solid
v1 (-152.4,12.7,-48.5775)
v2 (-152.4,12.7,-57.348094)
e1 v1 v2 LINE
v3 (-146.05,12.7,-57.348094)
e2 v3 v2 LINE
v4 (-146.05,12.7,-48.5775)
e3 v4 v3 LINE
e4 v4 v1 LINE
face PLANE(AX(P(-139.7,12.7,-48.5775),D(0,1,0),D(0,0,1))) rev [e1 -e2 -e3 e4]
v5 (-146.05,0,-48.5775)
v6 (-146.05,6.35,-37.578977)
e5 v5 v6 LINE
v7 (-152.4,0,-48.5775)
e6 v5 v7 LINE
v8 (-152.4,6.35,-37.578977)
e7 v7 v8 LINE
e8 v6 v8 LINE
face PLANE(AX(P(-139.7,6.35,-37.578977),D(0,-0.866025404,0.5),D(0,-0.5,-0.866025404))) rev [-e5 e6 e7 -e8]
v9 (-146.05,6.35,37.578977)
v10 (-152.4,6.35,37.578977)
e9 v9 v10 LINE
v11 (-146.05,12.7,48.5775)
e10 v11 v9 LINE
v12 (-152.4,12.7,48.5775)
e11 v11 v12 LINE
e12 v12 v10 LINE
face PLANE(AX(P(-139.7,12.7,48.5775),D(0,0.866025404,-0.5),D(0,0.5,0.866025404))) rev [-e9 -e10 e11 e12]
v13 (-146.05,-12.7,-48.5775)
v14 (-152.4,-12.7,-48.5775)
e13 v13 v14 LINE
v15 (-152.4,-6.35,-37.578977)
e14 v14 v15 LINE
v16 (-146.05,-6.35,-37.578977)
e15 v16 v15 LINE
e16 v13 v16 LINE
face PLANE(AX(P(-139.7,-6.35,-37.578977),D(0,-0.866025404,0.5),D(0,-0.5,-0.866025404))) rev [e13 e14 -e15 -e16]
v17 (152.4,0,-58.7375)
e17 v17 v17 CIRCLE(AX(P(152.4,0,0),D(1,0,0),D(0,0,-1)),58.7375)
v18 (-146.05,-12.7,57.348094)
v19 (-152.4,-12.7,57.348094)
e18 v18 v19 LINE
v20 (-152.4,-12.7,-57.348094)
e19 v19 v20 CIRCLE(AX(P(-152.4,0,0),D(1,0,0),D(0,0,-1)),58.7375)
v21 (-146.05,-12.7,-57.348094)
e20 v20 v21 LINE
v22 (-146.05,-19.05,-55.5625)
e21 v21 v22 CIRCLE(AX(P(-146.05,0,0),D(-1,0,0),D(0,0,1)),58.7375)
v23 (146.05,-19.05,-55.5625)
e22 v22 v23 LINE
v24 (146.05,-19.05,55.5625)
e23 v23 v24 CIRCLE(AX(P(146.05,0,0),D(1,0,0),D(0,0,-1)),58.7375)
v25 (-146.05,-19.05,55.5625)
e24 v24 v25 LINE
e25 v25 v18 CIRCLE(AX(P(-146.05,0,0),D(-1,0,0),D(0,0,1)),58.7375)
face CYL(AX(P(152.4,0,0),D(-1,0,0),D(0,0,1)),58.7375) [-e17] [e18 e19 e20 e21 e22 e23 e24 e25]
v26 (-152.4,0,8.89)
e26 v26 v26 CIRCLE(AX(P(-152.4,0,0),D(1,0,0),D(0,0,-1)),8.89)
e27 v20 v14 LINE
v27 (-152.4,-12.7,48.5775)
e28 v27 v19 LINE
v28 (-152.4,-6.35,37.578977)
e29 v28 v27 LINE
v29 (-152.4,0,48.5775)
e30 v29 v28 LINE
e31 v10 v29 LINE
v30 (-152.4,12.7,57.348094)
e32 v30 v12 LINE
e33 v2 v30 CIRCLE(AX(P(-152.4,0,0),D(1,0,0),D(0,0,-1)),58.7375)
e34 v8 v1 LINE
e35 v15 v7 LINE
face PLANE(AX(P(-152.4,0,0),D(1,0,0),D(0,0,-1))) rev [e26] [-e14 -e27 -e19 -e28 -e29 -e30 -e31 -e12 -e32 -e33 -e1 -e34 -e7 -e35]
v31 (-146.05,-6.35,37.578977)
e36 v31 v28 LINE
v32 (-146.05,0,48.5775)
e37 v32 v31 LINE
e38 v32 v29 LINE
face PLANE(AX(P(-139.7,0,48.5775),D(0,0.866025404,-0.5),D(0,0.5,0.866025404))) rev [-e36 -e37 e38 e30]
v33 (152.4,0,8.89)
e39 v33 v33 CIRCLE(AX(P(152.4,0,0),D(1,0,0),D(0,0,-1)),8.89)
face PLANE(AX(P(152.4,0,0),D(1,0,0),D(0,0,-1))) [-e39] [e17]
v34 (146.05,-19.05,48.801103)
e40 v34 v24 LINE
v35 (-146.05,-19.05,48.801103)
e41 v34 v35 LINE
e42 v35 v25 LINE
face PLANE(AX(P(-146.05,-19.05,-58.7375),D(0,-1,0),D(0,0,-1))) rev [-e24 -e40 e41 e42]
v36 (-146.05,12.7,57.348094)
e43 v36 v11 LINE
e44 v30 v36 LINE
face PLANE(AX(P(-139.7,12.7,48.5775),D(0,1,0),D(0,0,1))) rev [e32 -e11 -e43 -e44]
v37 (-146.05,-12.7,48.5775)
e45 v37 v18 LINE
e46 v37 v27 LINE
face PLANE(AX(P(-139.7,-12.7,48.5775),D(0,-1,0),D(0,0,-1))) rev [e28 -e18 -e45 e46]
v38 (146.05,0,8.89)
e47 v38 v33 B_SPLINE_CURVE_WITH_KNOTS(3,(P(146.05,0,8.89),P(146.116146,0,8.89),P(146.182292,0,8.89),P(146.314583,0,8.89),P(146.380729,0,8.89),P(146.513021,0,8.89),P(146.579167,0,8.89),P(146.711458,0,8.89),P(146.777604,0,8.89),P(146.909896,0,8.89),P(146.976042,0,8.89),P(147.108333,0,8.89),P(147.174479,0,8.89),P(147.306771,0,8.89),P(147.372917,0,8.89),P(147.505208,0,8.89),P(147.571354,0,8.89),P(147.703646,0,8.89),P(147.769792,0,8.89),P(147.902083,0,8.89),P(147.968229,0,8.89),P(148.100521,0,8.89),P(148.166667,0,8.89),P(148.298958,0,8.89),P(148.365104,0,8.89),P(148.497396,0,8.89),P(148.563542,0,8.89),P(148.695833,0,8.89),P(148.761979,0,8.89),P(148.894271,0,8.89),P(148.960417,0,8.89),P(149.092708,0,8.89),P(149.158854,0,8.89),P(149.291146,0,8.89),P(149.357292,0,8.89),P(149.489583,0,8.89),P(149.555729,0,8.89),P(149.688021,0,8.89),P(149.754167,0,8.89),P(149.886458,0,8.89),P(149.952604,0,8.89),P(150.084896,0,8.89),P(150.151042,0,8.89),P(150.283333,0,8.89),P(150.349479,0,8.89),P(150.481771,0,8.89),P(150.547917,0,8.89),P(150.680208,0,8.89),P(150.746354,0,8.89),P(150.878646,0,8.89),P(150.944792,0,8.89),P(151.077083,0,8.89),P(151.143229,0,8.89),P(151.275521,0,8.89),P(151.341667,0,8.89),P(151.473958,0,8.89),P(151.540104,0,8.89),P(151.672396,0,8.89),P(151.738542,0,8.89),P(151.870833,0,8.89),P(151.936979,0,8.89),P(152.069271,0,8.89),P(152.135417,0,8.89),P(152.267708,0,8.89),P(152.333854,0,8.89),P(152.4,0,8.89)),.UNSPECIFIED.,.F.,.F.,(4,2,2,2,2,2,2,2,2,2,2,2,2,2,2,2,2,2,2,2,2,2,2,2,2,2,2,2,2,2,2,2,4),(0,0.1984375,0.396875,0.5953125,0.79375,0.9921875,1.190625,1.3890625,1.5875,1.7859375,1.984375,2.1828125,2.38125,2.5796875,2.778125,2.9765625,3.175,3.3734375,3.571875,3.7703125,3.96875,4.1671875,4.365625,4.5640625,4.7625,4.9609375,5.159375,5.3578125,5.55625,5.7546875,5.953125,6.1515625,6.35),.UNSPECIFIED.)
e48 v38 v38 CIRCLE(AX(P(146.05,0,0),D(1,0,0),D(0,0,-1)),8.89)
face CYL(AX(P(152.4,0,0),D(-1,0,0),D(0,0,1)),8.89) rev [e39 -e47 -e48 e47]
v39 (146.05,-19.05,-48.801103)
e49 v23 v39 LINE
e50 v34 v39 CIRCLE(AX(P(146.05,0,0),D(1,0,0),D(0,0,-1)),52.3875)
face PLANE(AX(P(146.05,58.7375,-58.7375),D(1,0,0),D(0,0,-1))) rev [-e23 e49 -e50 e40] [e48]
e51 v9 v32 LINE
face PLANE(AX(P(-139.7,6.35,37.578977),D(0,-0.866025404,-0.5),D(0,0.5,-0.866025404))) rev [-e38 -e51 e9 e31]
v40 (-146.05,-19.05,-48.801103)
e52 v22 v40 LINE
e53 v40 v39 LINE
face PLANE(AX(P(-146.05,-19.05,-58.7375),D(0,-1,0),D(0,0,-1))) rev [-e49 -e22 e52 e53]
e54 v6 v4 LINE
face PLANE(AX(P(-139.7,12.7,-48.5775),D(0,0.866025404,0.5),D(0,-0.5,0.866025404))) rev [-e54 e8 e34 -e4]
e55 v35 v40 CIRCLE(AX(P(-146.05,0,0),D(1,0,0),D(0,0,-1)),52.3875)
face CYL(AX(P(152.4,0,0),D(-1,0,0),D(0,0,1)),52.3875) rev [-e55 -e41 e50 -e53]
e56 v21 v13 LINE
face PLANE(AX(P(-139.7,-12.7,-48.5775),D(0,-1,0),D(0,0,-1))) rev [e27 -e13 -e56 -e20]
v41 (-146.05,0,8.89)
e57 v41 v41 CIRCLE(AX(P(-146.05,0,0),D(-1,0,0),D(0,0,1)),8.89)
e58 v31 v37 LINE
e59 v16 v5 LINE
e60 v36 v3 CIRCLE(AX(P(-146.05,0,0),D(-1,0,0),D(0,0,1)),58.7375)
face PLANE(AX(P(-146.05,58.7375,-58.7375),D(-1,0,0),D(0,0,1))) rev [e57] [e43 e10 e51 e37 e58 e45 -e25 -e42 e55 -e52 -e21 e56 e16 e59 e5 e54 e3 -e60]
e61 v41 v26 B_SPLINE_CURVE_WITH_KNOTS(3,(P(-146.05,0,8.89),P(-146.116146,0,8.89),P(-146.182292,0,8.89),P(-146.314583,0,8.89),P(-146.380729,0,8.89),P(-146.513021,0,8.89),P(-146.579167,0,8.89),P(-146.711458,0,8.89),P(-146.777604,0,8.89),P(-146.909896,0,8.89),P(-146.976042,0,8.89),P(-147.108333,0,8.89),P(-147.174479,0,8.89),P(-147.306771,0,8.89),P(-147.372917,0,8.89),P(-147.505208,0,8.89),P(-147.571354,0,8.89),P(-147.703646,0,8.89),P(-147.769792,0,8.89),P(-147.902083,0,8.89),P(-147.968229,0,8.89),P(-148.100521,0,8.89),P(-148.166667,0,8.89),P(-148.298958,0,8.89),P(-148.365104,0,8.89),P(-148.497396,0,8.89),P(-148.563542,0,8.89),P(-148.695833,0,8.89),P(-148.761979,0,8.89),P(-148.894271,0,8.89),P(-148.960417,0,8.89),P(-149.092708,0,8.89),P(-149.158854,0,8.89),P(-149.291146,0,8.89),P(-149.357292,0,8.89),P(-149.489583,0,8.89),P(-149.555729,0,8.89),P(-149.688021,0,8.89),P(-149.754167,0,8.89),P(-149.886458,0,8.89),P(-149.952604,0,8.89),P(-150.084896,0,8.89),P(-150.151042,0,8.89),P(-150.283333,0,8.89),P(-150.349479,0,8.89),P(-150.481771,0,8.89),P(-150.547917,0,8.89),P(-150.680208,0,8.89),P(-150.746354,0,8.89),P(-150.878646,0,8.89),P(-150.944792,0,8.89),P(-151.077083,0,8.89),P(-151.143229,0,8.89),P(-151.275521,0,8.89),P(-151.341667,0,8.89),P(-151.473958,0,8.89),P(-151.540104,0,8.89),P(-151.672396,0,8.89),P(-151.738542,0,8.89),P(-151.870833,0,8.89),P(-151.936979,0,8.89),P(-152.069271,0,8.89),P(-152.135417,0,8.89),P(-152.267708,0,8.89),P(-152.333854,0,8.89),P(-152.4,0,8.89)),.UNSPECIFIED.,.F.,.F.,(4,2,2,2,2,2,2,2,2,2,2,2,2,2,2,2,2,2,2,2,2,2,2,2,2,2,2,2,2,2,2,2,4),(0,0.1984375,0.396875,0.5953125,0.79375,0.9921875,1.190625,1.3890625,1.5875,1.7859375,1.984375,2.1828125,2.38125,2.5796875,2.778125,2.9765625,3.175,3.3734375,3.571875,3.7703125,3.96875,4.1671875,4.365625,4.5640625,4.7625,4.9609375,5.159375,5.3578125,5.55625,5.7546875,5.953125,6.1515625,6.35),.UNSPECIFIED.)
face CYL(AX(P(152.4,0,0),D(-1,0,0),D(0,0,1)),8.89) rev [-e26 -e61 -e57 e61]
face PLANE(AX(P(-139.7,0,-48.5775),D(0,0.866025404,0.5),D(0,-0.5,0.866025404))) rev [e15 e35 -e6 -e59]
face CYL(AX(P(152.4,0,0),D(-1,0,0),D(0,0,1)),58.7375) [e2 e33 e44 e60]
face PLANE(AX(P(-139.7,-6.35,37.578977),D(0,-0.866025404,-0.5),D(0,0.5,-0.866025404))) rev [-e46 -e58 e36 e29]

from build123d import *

# Parameters (mm, degrees)
SKETCH1_R               = 58.7375
SKETCH1_R_2             = 8.89
BOSS_EXTRUDE1_DEPTH     = 152.4
CUT_EXTRUDE1_DEPTH      = 174.568279972
CUT_EXTRUDE1_DEPTH_BACK = 174.568279972
SKETCH2_W               = 292.1
SKETCH2_H               = 77.7875
SHELL1_START            = -146.05
SHELL1_DEPTH            = 292.1
CUT_EXTRUDE2_DEPTH      = 12.7


# Read off the part's stored shape, not the designer's step: Shell1
with BuildPart() as part:
    # Sketch1 → Boss-Extrude1 (new, symmetric)
    with BuildSketch(Plane(origin=(0, 0, 0), x_dir=(0, 0, -1), z_dir=(1, 0, 0))):
        with Locations(Location((0, 0, 0), (0, 0, 180))):
            Circle(SKETCH1_R)
        with Locations(Location((0, 0, 0), (0, 0, 180))):
            Circle(SKETCH1_R_2, mode=Mode.SUBTRACT)
    extrude(amount=BOSS_EXTRUDE1_DEPTH, both=True)

    # Sketch2 → Cut-Extrude1 (cut, two sides: drawn at the far end of the back side and taken through both)
    with BuildSketch(Plane.XY.offset(-CUT_EXTRUDE1_DEPTH_BACK)):
        with Locations((0, 19.84375)):
            Rectangle(SKETCH2_W, SKETCH2_H)
    extrude(amount=CUT_EXTRUDE1_DEPTH + CUT_EXTRUDE1_DEPTH_BACK, mode=Mode.SUBTRACT)

    # Shell1 outline → Shell1 (cut)
    with BuildSketch(Plane.YZ.offset(SHELL1_START)):
        with BuildLine():
            ThreePointArc((-19.05, 48.801103023), (-52.3875, 0), (-19.05, -48.801103023))
            Line((-19.05, -48.801103023), (-19.05, 48.801103023))
        make_face()
    extrude(amount=SHELL1_DEPTH, mode=Mode.SUBTRACT)

    # Sketch3 → Cut-Extrude2 (cut)
    with BuildSketch(Plane.ZY.offset(152.4)):
        Polygon((-48.5775, 12.7), (-37.578977372, 6.35), (-48.5775, 0), (-37.578977372, -6.35), (-48.5775, -12.7), (-58.7375, -12.7), (-58.7375, 12.7), align=None)
        Polygon((48.5775, 12.7), (58.7375, 12.7), (58.7375, -12.7), (48.5775, -12.7), (37.578977372, -6.35), (48.5775, 0), (37.578977372, 6.35), align=None)
    extrude(amount=-CUT_EXTRUDE2_DEPTH, mode=Mode.SUBTRACT)


solid = part.part
